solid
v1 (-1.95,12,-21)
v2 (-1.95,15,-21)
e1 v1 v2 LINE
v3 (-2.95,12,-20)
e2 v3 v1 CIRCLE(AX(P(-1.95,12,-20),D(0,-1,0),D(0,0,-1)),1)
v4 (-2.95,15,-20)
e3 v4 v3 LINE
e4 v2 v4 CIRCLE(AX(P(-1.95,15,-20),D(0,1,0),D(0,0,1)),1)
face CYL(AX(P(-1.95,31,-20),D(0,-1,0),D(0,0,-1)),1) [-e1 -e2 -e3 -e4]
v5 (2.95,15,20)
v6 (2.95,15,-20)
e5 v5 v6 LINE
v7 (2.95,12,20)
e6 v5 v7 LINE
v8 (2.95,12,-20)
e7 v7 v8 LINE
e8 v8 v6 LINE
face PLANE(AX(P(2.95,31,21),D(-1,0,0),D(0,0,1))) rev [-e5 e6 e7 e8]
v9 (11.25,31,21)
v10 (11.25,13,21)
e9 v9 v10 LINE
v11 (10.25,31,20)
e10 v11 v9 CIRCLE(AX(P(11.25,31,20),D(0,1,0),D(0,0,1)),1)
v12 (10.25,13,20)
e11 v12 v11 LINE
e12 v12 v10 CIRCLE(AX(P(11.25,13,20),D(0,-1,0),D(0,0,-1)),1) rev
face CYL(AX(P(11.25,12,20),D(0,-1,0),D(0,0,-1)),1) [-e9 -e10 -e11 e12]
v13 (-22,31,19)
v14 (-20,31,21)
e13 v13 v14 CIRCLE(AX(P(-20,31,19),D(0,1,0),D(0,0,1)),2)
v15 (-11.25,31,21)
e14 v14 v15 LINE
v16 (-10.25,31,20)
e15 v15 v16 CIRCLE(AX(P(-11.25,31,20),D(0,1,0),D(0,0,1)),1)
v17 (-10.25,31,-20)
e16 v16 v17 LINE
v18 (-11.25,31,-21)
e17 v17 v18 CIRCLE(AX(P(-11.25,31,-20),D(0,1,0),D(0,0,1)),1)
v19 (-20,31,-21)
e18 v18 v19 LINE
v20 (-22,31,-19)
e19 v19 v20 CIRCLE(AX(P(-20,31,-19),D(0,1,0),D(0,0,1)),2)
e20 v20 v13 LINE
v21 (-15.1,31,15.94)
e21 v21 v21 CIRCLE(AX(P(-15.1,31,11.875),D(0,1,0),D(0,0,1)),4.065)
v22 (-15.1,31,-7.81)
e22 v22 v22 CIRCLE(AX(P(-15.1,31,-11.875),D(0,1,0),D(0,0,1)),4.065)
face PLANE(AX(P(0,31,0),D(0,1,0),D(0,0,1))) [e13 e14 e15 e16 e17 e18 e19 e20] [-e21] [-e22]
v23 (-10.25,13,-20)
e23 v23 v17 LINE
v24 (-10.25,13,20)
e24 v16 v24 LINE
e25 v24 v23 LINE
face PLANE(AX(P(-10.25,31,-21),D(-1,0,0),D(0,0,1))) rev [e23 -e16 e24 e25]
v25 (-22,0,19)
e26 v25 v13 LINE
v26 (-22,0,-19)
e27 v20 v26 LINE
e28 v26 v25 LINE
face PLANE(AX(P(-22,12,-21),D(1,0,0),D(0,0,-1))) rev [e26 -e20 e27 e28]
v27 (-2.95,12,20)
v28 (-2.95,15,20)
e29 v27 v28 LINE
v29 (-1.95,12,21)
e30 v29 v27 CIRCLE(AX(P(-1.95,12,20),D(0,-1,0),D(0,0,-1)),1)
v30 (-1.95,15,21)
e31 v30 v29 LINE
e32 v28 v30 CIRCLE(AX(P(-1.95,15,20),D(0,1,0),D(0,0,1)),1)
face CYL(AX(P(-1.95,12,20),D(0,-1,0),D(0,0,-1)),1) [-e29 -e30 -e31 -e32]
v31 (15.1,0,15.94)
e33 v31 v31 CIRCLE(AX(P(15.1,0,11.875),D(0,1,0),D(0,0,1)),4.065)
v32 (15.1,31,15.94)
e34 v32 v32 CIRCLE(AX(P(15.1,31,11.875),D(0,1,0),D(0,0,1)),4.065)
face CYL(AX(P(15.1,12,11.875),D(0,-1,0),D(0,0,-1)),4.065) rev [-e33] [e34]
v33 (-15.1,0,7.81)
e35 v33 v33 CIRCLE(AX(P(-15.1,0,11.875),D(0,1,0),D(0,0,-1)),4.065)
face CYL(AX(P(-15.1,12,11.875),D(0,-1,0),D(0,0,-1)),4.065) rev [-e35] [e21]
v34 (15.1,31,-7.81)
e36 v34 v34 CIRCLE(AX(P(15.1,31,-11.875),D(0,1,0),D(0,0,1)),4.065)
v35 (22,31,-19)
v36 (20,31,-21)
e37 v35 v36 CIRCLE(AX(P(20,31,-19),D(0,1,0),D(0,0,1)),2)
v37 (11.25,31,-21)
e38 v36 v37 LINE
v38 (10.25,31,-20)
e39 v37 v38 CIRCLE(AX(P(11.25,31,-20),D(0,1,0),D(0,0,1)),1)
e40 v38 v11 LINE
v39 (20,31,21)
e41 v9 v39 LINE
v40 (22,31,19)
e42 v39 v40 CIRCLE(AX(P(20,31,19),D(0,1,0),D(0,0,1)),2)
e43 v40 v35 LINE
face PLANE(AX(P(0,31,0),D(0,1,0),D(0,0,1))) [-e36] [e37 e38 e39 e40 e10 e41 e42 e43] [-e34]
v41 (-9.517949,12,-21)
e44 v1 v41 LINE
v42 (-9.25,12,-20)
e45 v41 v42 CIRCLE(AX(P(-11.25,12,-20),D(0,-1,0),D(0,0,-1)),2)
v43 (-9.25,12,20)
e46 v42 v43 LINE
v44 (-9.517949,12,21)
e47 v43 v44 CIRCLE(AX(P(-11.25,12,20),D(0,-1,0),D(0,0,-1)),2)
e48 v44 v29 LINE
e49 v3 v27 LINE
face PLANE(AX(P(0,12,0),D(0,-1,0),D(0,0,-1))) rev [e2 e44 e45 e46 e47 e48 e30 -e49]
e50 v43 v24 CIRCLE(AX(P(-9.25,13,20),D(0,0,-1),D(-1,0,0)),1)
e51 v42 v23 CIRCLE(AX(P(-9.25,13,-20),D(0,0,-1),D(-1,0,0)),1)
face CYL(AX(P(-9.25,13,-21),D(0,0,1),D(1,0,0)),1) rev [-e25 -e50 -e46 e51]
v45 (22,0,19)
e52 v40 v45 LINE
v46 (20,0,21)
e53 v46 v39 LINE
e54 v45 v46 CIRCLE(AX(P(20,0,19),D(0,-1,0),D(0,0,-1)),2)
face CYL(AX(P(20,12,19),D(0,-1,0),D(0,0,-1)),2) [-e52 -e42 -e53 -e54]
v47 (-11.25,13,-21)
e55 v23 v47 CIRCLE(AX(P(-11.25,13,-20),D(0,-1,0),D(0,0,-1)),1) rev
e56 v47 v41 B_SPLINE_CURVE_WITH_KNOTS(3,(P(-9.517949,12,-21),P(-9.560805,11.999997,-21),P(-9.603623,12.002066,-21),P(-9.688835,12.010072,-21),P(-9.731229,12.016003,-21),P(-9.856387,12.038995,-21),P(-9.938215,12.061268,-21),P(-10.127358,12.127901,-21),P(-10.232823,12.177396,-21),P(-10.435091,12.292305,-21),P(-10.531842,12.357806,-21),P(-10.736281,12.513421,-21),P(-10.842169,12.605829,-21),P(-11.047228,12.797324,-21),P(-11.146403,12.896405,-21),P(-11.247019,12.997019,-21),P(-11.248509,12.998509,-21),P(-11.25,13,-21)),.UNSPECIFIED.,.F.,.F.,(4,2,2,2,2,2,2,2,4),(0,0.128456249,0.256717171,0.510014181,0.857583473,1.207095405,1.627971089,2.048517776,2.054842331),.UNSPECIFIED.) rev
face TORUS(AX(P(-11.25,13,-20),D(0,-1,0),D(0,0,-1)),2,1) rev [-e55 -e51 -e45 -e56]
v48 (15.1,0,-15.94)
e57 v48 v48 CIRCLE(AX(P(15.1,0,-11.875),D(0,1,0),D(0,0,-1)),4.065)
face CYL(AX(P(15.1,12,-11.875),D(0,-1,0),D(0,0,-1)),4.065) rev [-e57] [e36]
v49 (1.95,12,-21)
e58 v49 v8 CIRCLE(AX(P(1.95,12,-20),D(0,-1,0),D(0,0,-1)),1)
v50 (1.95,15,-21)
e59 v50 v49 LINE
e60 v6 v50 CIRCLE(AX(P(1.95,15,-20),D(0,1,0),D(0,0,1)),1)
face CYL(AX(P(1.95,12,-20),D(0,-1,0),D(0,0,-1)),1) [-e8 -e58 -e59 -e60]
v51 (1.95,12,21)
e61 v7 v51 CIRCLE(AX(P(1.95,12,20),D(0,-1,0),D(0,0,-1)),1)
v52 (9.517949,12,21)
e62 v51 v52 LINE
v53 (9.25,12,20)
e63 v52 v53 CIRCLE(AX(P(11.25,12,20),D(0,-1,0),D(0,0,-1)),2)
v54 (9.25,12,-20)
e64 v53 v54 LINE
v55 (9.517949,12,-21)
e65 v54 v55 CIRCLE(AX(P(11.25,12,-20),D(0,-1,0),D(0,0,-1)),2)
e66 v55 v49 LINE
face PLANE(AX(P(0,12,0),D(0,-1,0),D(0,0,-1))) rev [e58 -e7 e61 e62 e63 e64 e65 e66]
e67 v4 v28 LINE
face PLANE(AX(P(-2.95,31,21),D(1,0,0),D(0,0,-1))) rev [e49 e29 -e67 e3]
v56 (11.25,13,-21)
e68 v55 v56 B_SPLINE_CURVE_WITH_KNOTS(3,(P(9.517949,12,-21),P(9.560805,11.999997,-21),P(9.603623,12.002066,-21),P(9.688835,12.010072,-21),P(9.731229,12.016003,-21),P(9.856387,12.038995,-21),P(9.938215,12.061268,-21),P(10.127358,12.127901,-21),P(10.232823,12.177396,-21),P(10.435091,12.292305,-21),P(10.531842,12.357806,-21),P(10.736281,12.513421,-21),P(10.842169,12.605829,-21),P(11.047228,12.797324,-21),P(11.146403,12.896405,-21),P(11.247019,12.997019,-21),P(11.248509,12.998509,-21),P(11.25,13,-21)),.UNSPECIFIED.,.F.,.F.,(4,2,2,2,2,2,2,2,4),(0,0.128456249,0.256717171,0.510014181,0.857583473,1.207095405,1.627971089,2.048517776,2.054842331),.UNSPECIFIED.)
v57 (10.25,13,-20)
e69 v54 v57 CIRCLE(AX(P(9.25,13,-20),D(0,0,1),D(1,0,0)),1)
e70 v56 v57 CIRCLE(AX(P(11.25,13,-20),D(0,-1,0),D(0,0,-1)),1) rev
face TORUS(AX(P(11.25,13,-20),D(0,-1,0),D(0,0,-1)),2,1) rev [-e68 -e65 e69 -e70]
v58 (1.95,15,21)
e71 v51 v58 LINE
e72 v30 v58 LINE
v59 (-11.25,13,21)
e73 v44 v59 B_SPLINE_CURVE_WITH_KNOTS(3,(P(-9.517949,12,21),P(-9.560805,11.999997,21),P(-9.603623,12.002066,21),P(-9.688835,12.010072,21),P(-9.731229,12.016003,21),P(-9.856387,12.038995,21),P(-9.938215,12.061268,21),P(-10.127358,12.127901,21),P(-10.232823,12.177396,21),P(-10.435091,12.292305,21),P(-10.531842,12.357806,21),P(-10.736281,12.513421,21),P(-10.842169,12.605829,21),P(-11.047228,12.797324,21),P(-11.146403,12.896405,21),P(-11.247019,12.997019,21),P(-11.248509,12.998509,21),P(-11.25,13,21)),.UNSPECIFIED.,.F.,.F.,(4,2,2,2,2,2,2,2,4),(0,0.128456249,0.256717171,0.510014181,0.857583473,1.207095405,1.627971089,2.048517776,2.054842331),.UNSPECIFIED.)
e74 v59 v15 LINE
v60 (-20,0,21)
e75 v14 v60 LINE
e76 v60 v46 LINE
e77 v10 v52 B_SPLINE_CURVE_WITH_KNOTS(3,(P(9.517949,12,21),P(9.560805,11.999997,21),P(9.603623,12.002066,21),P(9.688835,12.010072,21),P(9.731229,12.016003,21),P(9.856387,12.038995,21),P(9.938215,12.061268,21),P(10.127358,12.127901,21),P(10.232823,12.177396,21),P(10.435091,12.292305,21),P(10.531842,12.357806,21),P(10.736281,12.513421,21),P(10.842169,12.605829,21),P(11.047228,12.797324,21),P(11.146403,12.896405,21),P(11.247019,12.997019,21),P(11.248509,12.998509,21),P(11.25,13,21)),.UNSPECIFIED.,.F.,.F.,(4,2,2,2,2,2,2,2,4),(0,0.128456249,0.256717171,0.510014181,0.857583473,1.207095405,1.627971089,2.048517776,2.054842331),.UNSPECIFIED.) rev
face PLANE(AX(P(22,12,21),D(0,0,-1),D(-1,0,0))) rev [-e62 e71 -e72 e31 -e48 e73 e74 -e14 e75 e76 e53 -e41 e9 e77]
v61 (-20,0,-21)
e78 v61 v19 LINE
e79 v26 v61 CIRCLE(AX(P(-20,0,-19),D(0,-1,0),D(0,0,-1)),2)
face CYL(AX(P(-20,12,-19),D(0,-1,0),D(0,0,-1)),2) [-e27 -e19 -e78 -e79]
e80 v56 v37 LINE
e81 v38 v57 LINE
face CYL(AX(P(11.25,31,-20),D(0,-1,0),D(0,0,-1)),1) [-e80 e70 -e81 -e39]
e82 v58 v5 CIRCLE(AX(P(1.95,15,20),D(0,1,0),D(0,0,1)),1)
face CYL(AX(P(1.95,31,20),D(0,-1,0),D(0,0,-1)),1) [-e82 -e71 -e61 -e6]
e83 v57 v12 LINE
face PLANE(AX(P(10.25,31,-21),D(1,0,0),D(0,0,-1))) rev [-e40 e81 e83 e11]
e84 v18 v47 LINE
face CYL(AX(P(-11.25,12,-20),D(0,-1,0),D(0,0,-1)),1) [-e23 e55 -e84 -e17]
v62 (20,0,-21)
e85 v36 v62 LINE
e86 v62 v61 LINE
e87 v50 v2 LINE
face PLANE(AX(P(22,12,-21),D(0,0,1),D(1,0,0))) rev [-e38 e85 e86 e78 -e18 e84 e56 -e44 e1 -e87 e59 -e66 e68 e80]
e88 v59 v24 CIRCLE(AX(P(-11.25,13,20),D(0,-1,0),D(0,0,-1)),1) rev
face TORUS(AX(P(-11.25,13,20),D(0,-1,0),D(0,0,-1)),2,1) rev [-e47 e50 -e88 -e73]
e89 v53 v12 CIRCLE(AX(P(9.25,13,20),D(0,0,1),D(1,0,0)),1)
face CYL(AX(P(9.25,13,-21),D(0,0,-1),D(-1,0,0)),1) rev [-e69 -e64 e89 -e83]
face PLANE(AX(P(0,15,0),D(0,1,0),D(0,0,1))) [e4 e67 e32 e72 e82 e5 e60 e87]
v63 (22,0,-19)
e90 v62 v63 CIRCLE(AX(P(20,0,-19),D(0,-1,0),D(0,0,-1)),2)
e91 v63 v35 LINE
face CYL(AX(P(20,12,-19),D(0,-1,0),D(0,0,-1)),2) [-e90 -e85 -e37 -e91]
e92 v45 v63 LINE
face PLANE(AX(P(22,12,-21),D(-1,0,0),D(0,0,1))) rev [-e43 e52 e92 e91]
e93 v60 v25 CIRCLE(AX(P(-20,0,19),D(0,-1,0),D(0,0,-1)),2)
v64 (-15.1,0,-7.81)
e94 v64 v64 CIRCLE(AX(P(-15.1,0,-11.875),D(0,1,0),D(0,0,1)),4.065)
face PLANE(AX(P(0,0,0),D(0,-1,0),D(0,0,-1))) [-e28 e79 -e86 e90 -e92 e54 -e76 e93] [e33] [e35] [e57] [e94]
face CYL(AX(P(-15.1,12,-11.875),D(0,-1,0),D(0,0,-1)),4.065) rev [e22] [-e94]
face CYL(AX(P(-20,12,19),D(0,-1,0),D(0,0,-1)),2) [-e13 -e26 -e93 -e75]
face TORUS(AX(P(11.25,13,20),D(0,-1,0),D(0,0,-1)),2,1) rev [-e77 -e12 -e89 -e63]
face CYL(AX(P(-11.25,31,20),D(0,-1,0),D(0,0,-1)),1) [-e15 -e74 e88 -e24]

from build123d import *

# Parameters (mm, degrees)
ESQUISSE1_W             = 44
ESQUISSE1_H             = 42
ESQUISSE1_R             = 4.065
BOSS_EXTRU_1_DEPTH      = 12
ESQUISSE2_W             = 5.9
ESQUISSE2_H             = 42
ESQUISSE2_W_2           = 11.75
ESQUISSE2_R             = 4.065
BOSS_EXTRU_2_DEPTH      = 19
ESQUISSE3_W             = 5.9
ESQUISSE3_H             = 42
ENL_V_MAT_EXTRU_1_DEPTH = 16
CONG_1_R                = 2
CONG_2_R                = 1
CONG_3_R                = 1


with BuildPart() as part:
    # Esquisse1 → Boss.-Extru.1 (new body)
    with BuildSketch(Plane(origin=(0, 0, 0), x_dir=(1, 0, 0), z_dir=(0, 1, 0))):
        Rectangle(ESQUISSE1_W, ESQUISSE1_H)
        with Locations(Location((-15.1, 11.875, 0), (0, 0, 270))):
            Circle(ESQUISSE1_R, mode=Mode.SUBTRACT)
        with Locations(Location((15.1, 11.875, 0), (0, 0, 90))):
            Circle(ESQUISSE1_R, mode=Mode.SUBTRACT)
        with Locations(Location((15.1, -11.875, 0), (0, 0, 270))):
            Circle(ESQUISSE1_R, mode=Mode.SUBTRACT)
        with Locations(Location((-15.1, -11.875, 0), (0, 0, 90))):
            Circle(ESQUISSE1_R, mode=Mode.SUBTRACT)
    extrude(amount=BOSS_EXTRU_1_DEPTH)

    # Esquisse2 → Boss.-Extru.2 (add)
    # profile 1 of 3: a face of its own
    with BuildSketch(Plane(origin=(0, 12, 0), x_dir=(1, 0, 0), z_dir=(0, 1, 0))):
        Rectangle(ESQUISSE2_W, ESQUISSE2_H)
    # profile 2 of 3: a face of its own
    with BuildSketch(Plane(origin=(0, 12, 0), x_dir=(1, 0, 0), z_dir=(0, 1, 0))):
        with Locations((-16.125, 0)):
            Rectangle(ESQUISSE2_W_2, ESQUISSE2_H)
        with Locations(Location((-15.1, -11.875, 0), (0, 0, 90))):
            Circle(ESQUISSE2_R, mode=Mode.SUBTRACT)
        with Locations(Location((-15.1, 11.875, 0), (0, 0, 270))):
            Circle(ESQUISSE2_R, mode=Mode.SUBTRACT)
    # profile 3 of 3: a face of its own
    with BuildSketch(Plane(origin=(0, 12, 0), x_dir=(1, 0, 0), z_dir=(0, 1, 0))):
        with Locations((16.125, 0)):
            Rectangle(ESQUISSE2_W_2, ESQUISSE2_H)
        with Locations(Location((15.1, 11.875, 0), (0, 0, 90))):
            Circle(ESQUISSE2_R, mode=Mode.SUBTRACT)
        with Locations(Location((15.1, -11.875, 0), (0, 0, 270))):
            Circle(ESQUISSE2_R, mode=Mode.SUBTRACT)
    extrude(amount=BOSS_EXTRU_2_DEPTH)

    # Esquisse3 → Enlèv. mat.-Extru.1 (cut)
    with BuildSketch(Plane(origin=(0, 31, 0), x_dir=(1, 0, 0), z_dir=(0, 1, 0))):
        Rectangle(ESQUISSE3_W, ESQUISSE3_H)
    extrude(amount=-ENL_V_MAT_EXTRU_1_DEPTH, mode=Mode.SUBTRACT)

    # Congé1
    cong_1_edges = [part.edges().sort_by_distance(p)[0] for p in [
        (-22, 15.5, -21),
        (22, 15.5, -21),
        (22, 15.5, 21),
        (-22, 15.5, 21),
    ]]
    fillet(cong_1_edges, radius=CONG_1_R)

    # Congé2
    cong_2_edges = [part.edges().sort_by_distance(p)[0] for p in [
        (-10.25, 21.5, 21),
        (-10.25, 21.5, -21),
        (10.25, 21.5, -21),
        (10.25, 21.5, 21),
        (-2.95, 13.5, 21),
        (-2.95, 13.5, -21),
        (2.95, 13.5, -21),
        (2.95, 13.5, 21),
    ]]
    fillet(cong_2_edges, radius=CONG_2_R)

    # Congé3
    # the kernel refuses this fillet: 1 mm, written as the material it adds along each edge
    with BuildSketch(Plane(origin=(10.25, 12, -20), x_dir=(0, 1, 0), z_dir=(0, 0, 1))) as cong_3_piece_1:
        with BuildLine():
            CenterArc((CONG_3_R, CONG_3_R), CONG_3_R, 180, 90)
            Line((0, CONG_3_R), (0, 0))
            Line((0, 0), (CONG_3_R, 0))
        make_face()
    extrude(amount=40)
    with BuildSketch(Plane(origin=(-10.25, 12, -20), x_dir=(0, 1, 0), z_dir=(0, 0, 1))) as cong_3_piece_2:
        with BuildLine():
            CenterArc((CONG_3_R, -CONG_3_R), CONG_3_R, 90, 90)
            Line((0, -CONG_3_R), (0, 0))
            Line((0, 0), (CONG_3_R, 0))
        make_face()
    extrude(amount=40)
    with BuildSketch(Plane(origin=(11.25, 12, -20), x_dir=(0.5976672776328271, 0, 0.8017442392976486), z_dir=(-0.8017442392976486, 0, 0.5976672776328271))) as cong_3_piece_3_section:
        with BuildLine():
            CenterArc((1 + CONG_3_R, CONG_3_R), CONG_3_R, 180, 90)
            Line((1, CONG_3_R), (1, 0))
            Line((1, 0), (1 + CONG_3_R, 0))
        make_face()
    cong_3_piece_3 = revolve(axis=Axis((11.25, 12, -20), (0, 1, 0)), revolution_arc=233.296989237, mode=Mode.PRIVATE)
    cong_3_piece_3 = split(cong_3_piece_3, bisect_by=Plane(origin=(10.500061043, 12.311628317, -21), z_dir=(0, 0, 1)), keep=Keep.TOP, mode=Mode.PRIVATE)
    add(cong_3_piece_3)
    with BuildSketch(Plane(origin=(11.25, 12, 20), x_dir=(-1, 0, 0), z_dir=(0, 0, -1))) as cong_3_piece_4_section:
        with BuildLine():
            CenterArc((1 + CONG_3_R, CONG_3_R), CONG_3_R, 180, 90)
            Line((1 + CONG_3_R, 0), (1, 0))
            Line((1, 0), (1, CONG_3_R))
        make_face()
    cong_3_piece_4 = revolve(axis=Axis((11.25, 12, 20), (0, 1, 0)), revolution_arc=233.296989237, mode=Mode.PRIVATE)
    cong_3_piece_4 = split(cong_3_piece_4, bisect_by=Plane(origin=(10.500061142, 12.311628426, 21), z_dir=(0, 0, -1)), keep=Keep.TOP, mode=Mode.PRIVATE)
    add(cong_3_piece_4)
    with BuildSketch(Plane(origin=(-11.25, 12, -20), x_dir=(-0.5976672776328282, 0, 0.8017442392976477), z_dir=(0.8017442392976477, 0, 0.5976672776328282))) as cong_3_piece_5_section:
        with BuildLine():
            CenterArc((1 + CONG_3_R, -CONG_3_R), CONG_3_R, 90, 90)
            Line((1 + CONG_3_R, 0), (1, 0))
            Line((1, 0), (1, -CONG_3_R))
        make_face()
    cong_3_piece_5 = revolve(axis=Axis((-11.25, 12, -20), (0, -1, 0)), revolution_arc=233.296989237, mode=Mode.PRIVATE)
    cong_3_piece_5 = split(cong_3_piece_5, bisect_by=Plane(origin=(-10.500061216, 12.311628717, -21), z_dir=(0, 0, 1)), keep=Keep.TOP, mode=Mode.PRIVATE)
    add(cong_3_piece_5)
    with BuildSketch(Plane(origin=(-11.25, 12, 20), x_dir=(1, 0, 0), z_dir=(0, 0, -1))) as cong_3_piece_6_section:
        with BuildLine():
            CenterArc((1 + CONG_3_R, -CONG_3_R), CONG_3_R, 90, 90)
            Line((1 + CONG_3_R, 0), (1, 0))
            Line((1, 0), (1, -CONG_3_R))
        make_face()
    cong_3_piece_6 = revolve(axis=Axis((-11.25, 12, 20), (0, -1, 0)), revolution_arc=233.296989237, mode=Mode.PRIVATE)
    cong_3_piece_6 = split(cong_3_piece_6, bisect_by=Plane(origin=(-10.500060984, 12.311628017, 21), z_dir=(0, 0, -1)), keep=Keep.TOP, mode=Mode.PRIVATE)
    add(cong_3_piece_6)


solid = part.part
